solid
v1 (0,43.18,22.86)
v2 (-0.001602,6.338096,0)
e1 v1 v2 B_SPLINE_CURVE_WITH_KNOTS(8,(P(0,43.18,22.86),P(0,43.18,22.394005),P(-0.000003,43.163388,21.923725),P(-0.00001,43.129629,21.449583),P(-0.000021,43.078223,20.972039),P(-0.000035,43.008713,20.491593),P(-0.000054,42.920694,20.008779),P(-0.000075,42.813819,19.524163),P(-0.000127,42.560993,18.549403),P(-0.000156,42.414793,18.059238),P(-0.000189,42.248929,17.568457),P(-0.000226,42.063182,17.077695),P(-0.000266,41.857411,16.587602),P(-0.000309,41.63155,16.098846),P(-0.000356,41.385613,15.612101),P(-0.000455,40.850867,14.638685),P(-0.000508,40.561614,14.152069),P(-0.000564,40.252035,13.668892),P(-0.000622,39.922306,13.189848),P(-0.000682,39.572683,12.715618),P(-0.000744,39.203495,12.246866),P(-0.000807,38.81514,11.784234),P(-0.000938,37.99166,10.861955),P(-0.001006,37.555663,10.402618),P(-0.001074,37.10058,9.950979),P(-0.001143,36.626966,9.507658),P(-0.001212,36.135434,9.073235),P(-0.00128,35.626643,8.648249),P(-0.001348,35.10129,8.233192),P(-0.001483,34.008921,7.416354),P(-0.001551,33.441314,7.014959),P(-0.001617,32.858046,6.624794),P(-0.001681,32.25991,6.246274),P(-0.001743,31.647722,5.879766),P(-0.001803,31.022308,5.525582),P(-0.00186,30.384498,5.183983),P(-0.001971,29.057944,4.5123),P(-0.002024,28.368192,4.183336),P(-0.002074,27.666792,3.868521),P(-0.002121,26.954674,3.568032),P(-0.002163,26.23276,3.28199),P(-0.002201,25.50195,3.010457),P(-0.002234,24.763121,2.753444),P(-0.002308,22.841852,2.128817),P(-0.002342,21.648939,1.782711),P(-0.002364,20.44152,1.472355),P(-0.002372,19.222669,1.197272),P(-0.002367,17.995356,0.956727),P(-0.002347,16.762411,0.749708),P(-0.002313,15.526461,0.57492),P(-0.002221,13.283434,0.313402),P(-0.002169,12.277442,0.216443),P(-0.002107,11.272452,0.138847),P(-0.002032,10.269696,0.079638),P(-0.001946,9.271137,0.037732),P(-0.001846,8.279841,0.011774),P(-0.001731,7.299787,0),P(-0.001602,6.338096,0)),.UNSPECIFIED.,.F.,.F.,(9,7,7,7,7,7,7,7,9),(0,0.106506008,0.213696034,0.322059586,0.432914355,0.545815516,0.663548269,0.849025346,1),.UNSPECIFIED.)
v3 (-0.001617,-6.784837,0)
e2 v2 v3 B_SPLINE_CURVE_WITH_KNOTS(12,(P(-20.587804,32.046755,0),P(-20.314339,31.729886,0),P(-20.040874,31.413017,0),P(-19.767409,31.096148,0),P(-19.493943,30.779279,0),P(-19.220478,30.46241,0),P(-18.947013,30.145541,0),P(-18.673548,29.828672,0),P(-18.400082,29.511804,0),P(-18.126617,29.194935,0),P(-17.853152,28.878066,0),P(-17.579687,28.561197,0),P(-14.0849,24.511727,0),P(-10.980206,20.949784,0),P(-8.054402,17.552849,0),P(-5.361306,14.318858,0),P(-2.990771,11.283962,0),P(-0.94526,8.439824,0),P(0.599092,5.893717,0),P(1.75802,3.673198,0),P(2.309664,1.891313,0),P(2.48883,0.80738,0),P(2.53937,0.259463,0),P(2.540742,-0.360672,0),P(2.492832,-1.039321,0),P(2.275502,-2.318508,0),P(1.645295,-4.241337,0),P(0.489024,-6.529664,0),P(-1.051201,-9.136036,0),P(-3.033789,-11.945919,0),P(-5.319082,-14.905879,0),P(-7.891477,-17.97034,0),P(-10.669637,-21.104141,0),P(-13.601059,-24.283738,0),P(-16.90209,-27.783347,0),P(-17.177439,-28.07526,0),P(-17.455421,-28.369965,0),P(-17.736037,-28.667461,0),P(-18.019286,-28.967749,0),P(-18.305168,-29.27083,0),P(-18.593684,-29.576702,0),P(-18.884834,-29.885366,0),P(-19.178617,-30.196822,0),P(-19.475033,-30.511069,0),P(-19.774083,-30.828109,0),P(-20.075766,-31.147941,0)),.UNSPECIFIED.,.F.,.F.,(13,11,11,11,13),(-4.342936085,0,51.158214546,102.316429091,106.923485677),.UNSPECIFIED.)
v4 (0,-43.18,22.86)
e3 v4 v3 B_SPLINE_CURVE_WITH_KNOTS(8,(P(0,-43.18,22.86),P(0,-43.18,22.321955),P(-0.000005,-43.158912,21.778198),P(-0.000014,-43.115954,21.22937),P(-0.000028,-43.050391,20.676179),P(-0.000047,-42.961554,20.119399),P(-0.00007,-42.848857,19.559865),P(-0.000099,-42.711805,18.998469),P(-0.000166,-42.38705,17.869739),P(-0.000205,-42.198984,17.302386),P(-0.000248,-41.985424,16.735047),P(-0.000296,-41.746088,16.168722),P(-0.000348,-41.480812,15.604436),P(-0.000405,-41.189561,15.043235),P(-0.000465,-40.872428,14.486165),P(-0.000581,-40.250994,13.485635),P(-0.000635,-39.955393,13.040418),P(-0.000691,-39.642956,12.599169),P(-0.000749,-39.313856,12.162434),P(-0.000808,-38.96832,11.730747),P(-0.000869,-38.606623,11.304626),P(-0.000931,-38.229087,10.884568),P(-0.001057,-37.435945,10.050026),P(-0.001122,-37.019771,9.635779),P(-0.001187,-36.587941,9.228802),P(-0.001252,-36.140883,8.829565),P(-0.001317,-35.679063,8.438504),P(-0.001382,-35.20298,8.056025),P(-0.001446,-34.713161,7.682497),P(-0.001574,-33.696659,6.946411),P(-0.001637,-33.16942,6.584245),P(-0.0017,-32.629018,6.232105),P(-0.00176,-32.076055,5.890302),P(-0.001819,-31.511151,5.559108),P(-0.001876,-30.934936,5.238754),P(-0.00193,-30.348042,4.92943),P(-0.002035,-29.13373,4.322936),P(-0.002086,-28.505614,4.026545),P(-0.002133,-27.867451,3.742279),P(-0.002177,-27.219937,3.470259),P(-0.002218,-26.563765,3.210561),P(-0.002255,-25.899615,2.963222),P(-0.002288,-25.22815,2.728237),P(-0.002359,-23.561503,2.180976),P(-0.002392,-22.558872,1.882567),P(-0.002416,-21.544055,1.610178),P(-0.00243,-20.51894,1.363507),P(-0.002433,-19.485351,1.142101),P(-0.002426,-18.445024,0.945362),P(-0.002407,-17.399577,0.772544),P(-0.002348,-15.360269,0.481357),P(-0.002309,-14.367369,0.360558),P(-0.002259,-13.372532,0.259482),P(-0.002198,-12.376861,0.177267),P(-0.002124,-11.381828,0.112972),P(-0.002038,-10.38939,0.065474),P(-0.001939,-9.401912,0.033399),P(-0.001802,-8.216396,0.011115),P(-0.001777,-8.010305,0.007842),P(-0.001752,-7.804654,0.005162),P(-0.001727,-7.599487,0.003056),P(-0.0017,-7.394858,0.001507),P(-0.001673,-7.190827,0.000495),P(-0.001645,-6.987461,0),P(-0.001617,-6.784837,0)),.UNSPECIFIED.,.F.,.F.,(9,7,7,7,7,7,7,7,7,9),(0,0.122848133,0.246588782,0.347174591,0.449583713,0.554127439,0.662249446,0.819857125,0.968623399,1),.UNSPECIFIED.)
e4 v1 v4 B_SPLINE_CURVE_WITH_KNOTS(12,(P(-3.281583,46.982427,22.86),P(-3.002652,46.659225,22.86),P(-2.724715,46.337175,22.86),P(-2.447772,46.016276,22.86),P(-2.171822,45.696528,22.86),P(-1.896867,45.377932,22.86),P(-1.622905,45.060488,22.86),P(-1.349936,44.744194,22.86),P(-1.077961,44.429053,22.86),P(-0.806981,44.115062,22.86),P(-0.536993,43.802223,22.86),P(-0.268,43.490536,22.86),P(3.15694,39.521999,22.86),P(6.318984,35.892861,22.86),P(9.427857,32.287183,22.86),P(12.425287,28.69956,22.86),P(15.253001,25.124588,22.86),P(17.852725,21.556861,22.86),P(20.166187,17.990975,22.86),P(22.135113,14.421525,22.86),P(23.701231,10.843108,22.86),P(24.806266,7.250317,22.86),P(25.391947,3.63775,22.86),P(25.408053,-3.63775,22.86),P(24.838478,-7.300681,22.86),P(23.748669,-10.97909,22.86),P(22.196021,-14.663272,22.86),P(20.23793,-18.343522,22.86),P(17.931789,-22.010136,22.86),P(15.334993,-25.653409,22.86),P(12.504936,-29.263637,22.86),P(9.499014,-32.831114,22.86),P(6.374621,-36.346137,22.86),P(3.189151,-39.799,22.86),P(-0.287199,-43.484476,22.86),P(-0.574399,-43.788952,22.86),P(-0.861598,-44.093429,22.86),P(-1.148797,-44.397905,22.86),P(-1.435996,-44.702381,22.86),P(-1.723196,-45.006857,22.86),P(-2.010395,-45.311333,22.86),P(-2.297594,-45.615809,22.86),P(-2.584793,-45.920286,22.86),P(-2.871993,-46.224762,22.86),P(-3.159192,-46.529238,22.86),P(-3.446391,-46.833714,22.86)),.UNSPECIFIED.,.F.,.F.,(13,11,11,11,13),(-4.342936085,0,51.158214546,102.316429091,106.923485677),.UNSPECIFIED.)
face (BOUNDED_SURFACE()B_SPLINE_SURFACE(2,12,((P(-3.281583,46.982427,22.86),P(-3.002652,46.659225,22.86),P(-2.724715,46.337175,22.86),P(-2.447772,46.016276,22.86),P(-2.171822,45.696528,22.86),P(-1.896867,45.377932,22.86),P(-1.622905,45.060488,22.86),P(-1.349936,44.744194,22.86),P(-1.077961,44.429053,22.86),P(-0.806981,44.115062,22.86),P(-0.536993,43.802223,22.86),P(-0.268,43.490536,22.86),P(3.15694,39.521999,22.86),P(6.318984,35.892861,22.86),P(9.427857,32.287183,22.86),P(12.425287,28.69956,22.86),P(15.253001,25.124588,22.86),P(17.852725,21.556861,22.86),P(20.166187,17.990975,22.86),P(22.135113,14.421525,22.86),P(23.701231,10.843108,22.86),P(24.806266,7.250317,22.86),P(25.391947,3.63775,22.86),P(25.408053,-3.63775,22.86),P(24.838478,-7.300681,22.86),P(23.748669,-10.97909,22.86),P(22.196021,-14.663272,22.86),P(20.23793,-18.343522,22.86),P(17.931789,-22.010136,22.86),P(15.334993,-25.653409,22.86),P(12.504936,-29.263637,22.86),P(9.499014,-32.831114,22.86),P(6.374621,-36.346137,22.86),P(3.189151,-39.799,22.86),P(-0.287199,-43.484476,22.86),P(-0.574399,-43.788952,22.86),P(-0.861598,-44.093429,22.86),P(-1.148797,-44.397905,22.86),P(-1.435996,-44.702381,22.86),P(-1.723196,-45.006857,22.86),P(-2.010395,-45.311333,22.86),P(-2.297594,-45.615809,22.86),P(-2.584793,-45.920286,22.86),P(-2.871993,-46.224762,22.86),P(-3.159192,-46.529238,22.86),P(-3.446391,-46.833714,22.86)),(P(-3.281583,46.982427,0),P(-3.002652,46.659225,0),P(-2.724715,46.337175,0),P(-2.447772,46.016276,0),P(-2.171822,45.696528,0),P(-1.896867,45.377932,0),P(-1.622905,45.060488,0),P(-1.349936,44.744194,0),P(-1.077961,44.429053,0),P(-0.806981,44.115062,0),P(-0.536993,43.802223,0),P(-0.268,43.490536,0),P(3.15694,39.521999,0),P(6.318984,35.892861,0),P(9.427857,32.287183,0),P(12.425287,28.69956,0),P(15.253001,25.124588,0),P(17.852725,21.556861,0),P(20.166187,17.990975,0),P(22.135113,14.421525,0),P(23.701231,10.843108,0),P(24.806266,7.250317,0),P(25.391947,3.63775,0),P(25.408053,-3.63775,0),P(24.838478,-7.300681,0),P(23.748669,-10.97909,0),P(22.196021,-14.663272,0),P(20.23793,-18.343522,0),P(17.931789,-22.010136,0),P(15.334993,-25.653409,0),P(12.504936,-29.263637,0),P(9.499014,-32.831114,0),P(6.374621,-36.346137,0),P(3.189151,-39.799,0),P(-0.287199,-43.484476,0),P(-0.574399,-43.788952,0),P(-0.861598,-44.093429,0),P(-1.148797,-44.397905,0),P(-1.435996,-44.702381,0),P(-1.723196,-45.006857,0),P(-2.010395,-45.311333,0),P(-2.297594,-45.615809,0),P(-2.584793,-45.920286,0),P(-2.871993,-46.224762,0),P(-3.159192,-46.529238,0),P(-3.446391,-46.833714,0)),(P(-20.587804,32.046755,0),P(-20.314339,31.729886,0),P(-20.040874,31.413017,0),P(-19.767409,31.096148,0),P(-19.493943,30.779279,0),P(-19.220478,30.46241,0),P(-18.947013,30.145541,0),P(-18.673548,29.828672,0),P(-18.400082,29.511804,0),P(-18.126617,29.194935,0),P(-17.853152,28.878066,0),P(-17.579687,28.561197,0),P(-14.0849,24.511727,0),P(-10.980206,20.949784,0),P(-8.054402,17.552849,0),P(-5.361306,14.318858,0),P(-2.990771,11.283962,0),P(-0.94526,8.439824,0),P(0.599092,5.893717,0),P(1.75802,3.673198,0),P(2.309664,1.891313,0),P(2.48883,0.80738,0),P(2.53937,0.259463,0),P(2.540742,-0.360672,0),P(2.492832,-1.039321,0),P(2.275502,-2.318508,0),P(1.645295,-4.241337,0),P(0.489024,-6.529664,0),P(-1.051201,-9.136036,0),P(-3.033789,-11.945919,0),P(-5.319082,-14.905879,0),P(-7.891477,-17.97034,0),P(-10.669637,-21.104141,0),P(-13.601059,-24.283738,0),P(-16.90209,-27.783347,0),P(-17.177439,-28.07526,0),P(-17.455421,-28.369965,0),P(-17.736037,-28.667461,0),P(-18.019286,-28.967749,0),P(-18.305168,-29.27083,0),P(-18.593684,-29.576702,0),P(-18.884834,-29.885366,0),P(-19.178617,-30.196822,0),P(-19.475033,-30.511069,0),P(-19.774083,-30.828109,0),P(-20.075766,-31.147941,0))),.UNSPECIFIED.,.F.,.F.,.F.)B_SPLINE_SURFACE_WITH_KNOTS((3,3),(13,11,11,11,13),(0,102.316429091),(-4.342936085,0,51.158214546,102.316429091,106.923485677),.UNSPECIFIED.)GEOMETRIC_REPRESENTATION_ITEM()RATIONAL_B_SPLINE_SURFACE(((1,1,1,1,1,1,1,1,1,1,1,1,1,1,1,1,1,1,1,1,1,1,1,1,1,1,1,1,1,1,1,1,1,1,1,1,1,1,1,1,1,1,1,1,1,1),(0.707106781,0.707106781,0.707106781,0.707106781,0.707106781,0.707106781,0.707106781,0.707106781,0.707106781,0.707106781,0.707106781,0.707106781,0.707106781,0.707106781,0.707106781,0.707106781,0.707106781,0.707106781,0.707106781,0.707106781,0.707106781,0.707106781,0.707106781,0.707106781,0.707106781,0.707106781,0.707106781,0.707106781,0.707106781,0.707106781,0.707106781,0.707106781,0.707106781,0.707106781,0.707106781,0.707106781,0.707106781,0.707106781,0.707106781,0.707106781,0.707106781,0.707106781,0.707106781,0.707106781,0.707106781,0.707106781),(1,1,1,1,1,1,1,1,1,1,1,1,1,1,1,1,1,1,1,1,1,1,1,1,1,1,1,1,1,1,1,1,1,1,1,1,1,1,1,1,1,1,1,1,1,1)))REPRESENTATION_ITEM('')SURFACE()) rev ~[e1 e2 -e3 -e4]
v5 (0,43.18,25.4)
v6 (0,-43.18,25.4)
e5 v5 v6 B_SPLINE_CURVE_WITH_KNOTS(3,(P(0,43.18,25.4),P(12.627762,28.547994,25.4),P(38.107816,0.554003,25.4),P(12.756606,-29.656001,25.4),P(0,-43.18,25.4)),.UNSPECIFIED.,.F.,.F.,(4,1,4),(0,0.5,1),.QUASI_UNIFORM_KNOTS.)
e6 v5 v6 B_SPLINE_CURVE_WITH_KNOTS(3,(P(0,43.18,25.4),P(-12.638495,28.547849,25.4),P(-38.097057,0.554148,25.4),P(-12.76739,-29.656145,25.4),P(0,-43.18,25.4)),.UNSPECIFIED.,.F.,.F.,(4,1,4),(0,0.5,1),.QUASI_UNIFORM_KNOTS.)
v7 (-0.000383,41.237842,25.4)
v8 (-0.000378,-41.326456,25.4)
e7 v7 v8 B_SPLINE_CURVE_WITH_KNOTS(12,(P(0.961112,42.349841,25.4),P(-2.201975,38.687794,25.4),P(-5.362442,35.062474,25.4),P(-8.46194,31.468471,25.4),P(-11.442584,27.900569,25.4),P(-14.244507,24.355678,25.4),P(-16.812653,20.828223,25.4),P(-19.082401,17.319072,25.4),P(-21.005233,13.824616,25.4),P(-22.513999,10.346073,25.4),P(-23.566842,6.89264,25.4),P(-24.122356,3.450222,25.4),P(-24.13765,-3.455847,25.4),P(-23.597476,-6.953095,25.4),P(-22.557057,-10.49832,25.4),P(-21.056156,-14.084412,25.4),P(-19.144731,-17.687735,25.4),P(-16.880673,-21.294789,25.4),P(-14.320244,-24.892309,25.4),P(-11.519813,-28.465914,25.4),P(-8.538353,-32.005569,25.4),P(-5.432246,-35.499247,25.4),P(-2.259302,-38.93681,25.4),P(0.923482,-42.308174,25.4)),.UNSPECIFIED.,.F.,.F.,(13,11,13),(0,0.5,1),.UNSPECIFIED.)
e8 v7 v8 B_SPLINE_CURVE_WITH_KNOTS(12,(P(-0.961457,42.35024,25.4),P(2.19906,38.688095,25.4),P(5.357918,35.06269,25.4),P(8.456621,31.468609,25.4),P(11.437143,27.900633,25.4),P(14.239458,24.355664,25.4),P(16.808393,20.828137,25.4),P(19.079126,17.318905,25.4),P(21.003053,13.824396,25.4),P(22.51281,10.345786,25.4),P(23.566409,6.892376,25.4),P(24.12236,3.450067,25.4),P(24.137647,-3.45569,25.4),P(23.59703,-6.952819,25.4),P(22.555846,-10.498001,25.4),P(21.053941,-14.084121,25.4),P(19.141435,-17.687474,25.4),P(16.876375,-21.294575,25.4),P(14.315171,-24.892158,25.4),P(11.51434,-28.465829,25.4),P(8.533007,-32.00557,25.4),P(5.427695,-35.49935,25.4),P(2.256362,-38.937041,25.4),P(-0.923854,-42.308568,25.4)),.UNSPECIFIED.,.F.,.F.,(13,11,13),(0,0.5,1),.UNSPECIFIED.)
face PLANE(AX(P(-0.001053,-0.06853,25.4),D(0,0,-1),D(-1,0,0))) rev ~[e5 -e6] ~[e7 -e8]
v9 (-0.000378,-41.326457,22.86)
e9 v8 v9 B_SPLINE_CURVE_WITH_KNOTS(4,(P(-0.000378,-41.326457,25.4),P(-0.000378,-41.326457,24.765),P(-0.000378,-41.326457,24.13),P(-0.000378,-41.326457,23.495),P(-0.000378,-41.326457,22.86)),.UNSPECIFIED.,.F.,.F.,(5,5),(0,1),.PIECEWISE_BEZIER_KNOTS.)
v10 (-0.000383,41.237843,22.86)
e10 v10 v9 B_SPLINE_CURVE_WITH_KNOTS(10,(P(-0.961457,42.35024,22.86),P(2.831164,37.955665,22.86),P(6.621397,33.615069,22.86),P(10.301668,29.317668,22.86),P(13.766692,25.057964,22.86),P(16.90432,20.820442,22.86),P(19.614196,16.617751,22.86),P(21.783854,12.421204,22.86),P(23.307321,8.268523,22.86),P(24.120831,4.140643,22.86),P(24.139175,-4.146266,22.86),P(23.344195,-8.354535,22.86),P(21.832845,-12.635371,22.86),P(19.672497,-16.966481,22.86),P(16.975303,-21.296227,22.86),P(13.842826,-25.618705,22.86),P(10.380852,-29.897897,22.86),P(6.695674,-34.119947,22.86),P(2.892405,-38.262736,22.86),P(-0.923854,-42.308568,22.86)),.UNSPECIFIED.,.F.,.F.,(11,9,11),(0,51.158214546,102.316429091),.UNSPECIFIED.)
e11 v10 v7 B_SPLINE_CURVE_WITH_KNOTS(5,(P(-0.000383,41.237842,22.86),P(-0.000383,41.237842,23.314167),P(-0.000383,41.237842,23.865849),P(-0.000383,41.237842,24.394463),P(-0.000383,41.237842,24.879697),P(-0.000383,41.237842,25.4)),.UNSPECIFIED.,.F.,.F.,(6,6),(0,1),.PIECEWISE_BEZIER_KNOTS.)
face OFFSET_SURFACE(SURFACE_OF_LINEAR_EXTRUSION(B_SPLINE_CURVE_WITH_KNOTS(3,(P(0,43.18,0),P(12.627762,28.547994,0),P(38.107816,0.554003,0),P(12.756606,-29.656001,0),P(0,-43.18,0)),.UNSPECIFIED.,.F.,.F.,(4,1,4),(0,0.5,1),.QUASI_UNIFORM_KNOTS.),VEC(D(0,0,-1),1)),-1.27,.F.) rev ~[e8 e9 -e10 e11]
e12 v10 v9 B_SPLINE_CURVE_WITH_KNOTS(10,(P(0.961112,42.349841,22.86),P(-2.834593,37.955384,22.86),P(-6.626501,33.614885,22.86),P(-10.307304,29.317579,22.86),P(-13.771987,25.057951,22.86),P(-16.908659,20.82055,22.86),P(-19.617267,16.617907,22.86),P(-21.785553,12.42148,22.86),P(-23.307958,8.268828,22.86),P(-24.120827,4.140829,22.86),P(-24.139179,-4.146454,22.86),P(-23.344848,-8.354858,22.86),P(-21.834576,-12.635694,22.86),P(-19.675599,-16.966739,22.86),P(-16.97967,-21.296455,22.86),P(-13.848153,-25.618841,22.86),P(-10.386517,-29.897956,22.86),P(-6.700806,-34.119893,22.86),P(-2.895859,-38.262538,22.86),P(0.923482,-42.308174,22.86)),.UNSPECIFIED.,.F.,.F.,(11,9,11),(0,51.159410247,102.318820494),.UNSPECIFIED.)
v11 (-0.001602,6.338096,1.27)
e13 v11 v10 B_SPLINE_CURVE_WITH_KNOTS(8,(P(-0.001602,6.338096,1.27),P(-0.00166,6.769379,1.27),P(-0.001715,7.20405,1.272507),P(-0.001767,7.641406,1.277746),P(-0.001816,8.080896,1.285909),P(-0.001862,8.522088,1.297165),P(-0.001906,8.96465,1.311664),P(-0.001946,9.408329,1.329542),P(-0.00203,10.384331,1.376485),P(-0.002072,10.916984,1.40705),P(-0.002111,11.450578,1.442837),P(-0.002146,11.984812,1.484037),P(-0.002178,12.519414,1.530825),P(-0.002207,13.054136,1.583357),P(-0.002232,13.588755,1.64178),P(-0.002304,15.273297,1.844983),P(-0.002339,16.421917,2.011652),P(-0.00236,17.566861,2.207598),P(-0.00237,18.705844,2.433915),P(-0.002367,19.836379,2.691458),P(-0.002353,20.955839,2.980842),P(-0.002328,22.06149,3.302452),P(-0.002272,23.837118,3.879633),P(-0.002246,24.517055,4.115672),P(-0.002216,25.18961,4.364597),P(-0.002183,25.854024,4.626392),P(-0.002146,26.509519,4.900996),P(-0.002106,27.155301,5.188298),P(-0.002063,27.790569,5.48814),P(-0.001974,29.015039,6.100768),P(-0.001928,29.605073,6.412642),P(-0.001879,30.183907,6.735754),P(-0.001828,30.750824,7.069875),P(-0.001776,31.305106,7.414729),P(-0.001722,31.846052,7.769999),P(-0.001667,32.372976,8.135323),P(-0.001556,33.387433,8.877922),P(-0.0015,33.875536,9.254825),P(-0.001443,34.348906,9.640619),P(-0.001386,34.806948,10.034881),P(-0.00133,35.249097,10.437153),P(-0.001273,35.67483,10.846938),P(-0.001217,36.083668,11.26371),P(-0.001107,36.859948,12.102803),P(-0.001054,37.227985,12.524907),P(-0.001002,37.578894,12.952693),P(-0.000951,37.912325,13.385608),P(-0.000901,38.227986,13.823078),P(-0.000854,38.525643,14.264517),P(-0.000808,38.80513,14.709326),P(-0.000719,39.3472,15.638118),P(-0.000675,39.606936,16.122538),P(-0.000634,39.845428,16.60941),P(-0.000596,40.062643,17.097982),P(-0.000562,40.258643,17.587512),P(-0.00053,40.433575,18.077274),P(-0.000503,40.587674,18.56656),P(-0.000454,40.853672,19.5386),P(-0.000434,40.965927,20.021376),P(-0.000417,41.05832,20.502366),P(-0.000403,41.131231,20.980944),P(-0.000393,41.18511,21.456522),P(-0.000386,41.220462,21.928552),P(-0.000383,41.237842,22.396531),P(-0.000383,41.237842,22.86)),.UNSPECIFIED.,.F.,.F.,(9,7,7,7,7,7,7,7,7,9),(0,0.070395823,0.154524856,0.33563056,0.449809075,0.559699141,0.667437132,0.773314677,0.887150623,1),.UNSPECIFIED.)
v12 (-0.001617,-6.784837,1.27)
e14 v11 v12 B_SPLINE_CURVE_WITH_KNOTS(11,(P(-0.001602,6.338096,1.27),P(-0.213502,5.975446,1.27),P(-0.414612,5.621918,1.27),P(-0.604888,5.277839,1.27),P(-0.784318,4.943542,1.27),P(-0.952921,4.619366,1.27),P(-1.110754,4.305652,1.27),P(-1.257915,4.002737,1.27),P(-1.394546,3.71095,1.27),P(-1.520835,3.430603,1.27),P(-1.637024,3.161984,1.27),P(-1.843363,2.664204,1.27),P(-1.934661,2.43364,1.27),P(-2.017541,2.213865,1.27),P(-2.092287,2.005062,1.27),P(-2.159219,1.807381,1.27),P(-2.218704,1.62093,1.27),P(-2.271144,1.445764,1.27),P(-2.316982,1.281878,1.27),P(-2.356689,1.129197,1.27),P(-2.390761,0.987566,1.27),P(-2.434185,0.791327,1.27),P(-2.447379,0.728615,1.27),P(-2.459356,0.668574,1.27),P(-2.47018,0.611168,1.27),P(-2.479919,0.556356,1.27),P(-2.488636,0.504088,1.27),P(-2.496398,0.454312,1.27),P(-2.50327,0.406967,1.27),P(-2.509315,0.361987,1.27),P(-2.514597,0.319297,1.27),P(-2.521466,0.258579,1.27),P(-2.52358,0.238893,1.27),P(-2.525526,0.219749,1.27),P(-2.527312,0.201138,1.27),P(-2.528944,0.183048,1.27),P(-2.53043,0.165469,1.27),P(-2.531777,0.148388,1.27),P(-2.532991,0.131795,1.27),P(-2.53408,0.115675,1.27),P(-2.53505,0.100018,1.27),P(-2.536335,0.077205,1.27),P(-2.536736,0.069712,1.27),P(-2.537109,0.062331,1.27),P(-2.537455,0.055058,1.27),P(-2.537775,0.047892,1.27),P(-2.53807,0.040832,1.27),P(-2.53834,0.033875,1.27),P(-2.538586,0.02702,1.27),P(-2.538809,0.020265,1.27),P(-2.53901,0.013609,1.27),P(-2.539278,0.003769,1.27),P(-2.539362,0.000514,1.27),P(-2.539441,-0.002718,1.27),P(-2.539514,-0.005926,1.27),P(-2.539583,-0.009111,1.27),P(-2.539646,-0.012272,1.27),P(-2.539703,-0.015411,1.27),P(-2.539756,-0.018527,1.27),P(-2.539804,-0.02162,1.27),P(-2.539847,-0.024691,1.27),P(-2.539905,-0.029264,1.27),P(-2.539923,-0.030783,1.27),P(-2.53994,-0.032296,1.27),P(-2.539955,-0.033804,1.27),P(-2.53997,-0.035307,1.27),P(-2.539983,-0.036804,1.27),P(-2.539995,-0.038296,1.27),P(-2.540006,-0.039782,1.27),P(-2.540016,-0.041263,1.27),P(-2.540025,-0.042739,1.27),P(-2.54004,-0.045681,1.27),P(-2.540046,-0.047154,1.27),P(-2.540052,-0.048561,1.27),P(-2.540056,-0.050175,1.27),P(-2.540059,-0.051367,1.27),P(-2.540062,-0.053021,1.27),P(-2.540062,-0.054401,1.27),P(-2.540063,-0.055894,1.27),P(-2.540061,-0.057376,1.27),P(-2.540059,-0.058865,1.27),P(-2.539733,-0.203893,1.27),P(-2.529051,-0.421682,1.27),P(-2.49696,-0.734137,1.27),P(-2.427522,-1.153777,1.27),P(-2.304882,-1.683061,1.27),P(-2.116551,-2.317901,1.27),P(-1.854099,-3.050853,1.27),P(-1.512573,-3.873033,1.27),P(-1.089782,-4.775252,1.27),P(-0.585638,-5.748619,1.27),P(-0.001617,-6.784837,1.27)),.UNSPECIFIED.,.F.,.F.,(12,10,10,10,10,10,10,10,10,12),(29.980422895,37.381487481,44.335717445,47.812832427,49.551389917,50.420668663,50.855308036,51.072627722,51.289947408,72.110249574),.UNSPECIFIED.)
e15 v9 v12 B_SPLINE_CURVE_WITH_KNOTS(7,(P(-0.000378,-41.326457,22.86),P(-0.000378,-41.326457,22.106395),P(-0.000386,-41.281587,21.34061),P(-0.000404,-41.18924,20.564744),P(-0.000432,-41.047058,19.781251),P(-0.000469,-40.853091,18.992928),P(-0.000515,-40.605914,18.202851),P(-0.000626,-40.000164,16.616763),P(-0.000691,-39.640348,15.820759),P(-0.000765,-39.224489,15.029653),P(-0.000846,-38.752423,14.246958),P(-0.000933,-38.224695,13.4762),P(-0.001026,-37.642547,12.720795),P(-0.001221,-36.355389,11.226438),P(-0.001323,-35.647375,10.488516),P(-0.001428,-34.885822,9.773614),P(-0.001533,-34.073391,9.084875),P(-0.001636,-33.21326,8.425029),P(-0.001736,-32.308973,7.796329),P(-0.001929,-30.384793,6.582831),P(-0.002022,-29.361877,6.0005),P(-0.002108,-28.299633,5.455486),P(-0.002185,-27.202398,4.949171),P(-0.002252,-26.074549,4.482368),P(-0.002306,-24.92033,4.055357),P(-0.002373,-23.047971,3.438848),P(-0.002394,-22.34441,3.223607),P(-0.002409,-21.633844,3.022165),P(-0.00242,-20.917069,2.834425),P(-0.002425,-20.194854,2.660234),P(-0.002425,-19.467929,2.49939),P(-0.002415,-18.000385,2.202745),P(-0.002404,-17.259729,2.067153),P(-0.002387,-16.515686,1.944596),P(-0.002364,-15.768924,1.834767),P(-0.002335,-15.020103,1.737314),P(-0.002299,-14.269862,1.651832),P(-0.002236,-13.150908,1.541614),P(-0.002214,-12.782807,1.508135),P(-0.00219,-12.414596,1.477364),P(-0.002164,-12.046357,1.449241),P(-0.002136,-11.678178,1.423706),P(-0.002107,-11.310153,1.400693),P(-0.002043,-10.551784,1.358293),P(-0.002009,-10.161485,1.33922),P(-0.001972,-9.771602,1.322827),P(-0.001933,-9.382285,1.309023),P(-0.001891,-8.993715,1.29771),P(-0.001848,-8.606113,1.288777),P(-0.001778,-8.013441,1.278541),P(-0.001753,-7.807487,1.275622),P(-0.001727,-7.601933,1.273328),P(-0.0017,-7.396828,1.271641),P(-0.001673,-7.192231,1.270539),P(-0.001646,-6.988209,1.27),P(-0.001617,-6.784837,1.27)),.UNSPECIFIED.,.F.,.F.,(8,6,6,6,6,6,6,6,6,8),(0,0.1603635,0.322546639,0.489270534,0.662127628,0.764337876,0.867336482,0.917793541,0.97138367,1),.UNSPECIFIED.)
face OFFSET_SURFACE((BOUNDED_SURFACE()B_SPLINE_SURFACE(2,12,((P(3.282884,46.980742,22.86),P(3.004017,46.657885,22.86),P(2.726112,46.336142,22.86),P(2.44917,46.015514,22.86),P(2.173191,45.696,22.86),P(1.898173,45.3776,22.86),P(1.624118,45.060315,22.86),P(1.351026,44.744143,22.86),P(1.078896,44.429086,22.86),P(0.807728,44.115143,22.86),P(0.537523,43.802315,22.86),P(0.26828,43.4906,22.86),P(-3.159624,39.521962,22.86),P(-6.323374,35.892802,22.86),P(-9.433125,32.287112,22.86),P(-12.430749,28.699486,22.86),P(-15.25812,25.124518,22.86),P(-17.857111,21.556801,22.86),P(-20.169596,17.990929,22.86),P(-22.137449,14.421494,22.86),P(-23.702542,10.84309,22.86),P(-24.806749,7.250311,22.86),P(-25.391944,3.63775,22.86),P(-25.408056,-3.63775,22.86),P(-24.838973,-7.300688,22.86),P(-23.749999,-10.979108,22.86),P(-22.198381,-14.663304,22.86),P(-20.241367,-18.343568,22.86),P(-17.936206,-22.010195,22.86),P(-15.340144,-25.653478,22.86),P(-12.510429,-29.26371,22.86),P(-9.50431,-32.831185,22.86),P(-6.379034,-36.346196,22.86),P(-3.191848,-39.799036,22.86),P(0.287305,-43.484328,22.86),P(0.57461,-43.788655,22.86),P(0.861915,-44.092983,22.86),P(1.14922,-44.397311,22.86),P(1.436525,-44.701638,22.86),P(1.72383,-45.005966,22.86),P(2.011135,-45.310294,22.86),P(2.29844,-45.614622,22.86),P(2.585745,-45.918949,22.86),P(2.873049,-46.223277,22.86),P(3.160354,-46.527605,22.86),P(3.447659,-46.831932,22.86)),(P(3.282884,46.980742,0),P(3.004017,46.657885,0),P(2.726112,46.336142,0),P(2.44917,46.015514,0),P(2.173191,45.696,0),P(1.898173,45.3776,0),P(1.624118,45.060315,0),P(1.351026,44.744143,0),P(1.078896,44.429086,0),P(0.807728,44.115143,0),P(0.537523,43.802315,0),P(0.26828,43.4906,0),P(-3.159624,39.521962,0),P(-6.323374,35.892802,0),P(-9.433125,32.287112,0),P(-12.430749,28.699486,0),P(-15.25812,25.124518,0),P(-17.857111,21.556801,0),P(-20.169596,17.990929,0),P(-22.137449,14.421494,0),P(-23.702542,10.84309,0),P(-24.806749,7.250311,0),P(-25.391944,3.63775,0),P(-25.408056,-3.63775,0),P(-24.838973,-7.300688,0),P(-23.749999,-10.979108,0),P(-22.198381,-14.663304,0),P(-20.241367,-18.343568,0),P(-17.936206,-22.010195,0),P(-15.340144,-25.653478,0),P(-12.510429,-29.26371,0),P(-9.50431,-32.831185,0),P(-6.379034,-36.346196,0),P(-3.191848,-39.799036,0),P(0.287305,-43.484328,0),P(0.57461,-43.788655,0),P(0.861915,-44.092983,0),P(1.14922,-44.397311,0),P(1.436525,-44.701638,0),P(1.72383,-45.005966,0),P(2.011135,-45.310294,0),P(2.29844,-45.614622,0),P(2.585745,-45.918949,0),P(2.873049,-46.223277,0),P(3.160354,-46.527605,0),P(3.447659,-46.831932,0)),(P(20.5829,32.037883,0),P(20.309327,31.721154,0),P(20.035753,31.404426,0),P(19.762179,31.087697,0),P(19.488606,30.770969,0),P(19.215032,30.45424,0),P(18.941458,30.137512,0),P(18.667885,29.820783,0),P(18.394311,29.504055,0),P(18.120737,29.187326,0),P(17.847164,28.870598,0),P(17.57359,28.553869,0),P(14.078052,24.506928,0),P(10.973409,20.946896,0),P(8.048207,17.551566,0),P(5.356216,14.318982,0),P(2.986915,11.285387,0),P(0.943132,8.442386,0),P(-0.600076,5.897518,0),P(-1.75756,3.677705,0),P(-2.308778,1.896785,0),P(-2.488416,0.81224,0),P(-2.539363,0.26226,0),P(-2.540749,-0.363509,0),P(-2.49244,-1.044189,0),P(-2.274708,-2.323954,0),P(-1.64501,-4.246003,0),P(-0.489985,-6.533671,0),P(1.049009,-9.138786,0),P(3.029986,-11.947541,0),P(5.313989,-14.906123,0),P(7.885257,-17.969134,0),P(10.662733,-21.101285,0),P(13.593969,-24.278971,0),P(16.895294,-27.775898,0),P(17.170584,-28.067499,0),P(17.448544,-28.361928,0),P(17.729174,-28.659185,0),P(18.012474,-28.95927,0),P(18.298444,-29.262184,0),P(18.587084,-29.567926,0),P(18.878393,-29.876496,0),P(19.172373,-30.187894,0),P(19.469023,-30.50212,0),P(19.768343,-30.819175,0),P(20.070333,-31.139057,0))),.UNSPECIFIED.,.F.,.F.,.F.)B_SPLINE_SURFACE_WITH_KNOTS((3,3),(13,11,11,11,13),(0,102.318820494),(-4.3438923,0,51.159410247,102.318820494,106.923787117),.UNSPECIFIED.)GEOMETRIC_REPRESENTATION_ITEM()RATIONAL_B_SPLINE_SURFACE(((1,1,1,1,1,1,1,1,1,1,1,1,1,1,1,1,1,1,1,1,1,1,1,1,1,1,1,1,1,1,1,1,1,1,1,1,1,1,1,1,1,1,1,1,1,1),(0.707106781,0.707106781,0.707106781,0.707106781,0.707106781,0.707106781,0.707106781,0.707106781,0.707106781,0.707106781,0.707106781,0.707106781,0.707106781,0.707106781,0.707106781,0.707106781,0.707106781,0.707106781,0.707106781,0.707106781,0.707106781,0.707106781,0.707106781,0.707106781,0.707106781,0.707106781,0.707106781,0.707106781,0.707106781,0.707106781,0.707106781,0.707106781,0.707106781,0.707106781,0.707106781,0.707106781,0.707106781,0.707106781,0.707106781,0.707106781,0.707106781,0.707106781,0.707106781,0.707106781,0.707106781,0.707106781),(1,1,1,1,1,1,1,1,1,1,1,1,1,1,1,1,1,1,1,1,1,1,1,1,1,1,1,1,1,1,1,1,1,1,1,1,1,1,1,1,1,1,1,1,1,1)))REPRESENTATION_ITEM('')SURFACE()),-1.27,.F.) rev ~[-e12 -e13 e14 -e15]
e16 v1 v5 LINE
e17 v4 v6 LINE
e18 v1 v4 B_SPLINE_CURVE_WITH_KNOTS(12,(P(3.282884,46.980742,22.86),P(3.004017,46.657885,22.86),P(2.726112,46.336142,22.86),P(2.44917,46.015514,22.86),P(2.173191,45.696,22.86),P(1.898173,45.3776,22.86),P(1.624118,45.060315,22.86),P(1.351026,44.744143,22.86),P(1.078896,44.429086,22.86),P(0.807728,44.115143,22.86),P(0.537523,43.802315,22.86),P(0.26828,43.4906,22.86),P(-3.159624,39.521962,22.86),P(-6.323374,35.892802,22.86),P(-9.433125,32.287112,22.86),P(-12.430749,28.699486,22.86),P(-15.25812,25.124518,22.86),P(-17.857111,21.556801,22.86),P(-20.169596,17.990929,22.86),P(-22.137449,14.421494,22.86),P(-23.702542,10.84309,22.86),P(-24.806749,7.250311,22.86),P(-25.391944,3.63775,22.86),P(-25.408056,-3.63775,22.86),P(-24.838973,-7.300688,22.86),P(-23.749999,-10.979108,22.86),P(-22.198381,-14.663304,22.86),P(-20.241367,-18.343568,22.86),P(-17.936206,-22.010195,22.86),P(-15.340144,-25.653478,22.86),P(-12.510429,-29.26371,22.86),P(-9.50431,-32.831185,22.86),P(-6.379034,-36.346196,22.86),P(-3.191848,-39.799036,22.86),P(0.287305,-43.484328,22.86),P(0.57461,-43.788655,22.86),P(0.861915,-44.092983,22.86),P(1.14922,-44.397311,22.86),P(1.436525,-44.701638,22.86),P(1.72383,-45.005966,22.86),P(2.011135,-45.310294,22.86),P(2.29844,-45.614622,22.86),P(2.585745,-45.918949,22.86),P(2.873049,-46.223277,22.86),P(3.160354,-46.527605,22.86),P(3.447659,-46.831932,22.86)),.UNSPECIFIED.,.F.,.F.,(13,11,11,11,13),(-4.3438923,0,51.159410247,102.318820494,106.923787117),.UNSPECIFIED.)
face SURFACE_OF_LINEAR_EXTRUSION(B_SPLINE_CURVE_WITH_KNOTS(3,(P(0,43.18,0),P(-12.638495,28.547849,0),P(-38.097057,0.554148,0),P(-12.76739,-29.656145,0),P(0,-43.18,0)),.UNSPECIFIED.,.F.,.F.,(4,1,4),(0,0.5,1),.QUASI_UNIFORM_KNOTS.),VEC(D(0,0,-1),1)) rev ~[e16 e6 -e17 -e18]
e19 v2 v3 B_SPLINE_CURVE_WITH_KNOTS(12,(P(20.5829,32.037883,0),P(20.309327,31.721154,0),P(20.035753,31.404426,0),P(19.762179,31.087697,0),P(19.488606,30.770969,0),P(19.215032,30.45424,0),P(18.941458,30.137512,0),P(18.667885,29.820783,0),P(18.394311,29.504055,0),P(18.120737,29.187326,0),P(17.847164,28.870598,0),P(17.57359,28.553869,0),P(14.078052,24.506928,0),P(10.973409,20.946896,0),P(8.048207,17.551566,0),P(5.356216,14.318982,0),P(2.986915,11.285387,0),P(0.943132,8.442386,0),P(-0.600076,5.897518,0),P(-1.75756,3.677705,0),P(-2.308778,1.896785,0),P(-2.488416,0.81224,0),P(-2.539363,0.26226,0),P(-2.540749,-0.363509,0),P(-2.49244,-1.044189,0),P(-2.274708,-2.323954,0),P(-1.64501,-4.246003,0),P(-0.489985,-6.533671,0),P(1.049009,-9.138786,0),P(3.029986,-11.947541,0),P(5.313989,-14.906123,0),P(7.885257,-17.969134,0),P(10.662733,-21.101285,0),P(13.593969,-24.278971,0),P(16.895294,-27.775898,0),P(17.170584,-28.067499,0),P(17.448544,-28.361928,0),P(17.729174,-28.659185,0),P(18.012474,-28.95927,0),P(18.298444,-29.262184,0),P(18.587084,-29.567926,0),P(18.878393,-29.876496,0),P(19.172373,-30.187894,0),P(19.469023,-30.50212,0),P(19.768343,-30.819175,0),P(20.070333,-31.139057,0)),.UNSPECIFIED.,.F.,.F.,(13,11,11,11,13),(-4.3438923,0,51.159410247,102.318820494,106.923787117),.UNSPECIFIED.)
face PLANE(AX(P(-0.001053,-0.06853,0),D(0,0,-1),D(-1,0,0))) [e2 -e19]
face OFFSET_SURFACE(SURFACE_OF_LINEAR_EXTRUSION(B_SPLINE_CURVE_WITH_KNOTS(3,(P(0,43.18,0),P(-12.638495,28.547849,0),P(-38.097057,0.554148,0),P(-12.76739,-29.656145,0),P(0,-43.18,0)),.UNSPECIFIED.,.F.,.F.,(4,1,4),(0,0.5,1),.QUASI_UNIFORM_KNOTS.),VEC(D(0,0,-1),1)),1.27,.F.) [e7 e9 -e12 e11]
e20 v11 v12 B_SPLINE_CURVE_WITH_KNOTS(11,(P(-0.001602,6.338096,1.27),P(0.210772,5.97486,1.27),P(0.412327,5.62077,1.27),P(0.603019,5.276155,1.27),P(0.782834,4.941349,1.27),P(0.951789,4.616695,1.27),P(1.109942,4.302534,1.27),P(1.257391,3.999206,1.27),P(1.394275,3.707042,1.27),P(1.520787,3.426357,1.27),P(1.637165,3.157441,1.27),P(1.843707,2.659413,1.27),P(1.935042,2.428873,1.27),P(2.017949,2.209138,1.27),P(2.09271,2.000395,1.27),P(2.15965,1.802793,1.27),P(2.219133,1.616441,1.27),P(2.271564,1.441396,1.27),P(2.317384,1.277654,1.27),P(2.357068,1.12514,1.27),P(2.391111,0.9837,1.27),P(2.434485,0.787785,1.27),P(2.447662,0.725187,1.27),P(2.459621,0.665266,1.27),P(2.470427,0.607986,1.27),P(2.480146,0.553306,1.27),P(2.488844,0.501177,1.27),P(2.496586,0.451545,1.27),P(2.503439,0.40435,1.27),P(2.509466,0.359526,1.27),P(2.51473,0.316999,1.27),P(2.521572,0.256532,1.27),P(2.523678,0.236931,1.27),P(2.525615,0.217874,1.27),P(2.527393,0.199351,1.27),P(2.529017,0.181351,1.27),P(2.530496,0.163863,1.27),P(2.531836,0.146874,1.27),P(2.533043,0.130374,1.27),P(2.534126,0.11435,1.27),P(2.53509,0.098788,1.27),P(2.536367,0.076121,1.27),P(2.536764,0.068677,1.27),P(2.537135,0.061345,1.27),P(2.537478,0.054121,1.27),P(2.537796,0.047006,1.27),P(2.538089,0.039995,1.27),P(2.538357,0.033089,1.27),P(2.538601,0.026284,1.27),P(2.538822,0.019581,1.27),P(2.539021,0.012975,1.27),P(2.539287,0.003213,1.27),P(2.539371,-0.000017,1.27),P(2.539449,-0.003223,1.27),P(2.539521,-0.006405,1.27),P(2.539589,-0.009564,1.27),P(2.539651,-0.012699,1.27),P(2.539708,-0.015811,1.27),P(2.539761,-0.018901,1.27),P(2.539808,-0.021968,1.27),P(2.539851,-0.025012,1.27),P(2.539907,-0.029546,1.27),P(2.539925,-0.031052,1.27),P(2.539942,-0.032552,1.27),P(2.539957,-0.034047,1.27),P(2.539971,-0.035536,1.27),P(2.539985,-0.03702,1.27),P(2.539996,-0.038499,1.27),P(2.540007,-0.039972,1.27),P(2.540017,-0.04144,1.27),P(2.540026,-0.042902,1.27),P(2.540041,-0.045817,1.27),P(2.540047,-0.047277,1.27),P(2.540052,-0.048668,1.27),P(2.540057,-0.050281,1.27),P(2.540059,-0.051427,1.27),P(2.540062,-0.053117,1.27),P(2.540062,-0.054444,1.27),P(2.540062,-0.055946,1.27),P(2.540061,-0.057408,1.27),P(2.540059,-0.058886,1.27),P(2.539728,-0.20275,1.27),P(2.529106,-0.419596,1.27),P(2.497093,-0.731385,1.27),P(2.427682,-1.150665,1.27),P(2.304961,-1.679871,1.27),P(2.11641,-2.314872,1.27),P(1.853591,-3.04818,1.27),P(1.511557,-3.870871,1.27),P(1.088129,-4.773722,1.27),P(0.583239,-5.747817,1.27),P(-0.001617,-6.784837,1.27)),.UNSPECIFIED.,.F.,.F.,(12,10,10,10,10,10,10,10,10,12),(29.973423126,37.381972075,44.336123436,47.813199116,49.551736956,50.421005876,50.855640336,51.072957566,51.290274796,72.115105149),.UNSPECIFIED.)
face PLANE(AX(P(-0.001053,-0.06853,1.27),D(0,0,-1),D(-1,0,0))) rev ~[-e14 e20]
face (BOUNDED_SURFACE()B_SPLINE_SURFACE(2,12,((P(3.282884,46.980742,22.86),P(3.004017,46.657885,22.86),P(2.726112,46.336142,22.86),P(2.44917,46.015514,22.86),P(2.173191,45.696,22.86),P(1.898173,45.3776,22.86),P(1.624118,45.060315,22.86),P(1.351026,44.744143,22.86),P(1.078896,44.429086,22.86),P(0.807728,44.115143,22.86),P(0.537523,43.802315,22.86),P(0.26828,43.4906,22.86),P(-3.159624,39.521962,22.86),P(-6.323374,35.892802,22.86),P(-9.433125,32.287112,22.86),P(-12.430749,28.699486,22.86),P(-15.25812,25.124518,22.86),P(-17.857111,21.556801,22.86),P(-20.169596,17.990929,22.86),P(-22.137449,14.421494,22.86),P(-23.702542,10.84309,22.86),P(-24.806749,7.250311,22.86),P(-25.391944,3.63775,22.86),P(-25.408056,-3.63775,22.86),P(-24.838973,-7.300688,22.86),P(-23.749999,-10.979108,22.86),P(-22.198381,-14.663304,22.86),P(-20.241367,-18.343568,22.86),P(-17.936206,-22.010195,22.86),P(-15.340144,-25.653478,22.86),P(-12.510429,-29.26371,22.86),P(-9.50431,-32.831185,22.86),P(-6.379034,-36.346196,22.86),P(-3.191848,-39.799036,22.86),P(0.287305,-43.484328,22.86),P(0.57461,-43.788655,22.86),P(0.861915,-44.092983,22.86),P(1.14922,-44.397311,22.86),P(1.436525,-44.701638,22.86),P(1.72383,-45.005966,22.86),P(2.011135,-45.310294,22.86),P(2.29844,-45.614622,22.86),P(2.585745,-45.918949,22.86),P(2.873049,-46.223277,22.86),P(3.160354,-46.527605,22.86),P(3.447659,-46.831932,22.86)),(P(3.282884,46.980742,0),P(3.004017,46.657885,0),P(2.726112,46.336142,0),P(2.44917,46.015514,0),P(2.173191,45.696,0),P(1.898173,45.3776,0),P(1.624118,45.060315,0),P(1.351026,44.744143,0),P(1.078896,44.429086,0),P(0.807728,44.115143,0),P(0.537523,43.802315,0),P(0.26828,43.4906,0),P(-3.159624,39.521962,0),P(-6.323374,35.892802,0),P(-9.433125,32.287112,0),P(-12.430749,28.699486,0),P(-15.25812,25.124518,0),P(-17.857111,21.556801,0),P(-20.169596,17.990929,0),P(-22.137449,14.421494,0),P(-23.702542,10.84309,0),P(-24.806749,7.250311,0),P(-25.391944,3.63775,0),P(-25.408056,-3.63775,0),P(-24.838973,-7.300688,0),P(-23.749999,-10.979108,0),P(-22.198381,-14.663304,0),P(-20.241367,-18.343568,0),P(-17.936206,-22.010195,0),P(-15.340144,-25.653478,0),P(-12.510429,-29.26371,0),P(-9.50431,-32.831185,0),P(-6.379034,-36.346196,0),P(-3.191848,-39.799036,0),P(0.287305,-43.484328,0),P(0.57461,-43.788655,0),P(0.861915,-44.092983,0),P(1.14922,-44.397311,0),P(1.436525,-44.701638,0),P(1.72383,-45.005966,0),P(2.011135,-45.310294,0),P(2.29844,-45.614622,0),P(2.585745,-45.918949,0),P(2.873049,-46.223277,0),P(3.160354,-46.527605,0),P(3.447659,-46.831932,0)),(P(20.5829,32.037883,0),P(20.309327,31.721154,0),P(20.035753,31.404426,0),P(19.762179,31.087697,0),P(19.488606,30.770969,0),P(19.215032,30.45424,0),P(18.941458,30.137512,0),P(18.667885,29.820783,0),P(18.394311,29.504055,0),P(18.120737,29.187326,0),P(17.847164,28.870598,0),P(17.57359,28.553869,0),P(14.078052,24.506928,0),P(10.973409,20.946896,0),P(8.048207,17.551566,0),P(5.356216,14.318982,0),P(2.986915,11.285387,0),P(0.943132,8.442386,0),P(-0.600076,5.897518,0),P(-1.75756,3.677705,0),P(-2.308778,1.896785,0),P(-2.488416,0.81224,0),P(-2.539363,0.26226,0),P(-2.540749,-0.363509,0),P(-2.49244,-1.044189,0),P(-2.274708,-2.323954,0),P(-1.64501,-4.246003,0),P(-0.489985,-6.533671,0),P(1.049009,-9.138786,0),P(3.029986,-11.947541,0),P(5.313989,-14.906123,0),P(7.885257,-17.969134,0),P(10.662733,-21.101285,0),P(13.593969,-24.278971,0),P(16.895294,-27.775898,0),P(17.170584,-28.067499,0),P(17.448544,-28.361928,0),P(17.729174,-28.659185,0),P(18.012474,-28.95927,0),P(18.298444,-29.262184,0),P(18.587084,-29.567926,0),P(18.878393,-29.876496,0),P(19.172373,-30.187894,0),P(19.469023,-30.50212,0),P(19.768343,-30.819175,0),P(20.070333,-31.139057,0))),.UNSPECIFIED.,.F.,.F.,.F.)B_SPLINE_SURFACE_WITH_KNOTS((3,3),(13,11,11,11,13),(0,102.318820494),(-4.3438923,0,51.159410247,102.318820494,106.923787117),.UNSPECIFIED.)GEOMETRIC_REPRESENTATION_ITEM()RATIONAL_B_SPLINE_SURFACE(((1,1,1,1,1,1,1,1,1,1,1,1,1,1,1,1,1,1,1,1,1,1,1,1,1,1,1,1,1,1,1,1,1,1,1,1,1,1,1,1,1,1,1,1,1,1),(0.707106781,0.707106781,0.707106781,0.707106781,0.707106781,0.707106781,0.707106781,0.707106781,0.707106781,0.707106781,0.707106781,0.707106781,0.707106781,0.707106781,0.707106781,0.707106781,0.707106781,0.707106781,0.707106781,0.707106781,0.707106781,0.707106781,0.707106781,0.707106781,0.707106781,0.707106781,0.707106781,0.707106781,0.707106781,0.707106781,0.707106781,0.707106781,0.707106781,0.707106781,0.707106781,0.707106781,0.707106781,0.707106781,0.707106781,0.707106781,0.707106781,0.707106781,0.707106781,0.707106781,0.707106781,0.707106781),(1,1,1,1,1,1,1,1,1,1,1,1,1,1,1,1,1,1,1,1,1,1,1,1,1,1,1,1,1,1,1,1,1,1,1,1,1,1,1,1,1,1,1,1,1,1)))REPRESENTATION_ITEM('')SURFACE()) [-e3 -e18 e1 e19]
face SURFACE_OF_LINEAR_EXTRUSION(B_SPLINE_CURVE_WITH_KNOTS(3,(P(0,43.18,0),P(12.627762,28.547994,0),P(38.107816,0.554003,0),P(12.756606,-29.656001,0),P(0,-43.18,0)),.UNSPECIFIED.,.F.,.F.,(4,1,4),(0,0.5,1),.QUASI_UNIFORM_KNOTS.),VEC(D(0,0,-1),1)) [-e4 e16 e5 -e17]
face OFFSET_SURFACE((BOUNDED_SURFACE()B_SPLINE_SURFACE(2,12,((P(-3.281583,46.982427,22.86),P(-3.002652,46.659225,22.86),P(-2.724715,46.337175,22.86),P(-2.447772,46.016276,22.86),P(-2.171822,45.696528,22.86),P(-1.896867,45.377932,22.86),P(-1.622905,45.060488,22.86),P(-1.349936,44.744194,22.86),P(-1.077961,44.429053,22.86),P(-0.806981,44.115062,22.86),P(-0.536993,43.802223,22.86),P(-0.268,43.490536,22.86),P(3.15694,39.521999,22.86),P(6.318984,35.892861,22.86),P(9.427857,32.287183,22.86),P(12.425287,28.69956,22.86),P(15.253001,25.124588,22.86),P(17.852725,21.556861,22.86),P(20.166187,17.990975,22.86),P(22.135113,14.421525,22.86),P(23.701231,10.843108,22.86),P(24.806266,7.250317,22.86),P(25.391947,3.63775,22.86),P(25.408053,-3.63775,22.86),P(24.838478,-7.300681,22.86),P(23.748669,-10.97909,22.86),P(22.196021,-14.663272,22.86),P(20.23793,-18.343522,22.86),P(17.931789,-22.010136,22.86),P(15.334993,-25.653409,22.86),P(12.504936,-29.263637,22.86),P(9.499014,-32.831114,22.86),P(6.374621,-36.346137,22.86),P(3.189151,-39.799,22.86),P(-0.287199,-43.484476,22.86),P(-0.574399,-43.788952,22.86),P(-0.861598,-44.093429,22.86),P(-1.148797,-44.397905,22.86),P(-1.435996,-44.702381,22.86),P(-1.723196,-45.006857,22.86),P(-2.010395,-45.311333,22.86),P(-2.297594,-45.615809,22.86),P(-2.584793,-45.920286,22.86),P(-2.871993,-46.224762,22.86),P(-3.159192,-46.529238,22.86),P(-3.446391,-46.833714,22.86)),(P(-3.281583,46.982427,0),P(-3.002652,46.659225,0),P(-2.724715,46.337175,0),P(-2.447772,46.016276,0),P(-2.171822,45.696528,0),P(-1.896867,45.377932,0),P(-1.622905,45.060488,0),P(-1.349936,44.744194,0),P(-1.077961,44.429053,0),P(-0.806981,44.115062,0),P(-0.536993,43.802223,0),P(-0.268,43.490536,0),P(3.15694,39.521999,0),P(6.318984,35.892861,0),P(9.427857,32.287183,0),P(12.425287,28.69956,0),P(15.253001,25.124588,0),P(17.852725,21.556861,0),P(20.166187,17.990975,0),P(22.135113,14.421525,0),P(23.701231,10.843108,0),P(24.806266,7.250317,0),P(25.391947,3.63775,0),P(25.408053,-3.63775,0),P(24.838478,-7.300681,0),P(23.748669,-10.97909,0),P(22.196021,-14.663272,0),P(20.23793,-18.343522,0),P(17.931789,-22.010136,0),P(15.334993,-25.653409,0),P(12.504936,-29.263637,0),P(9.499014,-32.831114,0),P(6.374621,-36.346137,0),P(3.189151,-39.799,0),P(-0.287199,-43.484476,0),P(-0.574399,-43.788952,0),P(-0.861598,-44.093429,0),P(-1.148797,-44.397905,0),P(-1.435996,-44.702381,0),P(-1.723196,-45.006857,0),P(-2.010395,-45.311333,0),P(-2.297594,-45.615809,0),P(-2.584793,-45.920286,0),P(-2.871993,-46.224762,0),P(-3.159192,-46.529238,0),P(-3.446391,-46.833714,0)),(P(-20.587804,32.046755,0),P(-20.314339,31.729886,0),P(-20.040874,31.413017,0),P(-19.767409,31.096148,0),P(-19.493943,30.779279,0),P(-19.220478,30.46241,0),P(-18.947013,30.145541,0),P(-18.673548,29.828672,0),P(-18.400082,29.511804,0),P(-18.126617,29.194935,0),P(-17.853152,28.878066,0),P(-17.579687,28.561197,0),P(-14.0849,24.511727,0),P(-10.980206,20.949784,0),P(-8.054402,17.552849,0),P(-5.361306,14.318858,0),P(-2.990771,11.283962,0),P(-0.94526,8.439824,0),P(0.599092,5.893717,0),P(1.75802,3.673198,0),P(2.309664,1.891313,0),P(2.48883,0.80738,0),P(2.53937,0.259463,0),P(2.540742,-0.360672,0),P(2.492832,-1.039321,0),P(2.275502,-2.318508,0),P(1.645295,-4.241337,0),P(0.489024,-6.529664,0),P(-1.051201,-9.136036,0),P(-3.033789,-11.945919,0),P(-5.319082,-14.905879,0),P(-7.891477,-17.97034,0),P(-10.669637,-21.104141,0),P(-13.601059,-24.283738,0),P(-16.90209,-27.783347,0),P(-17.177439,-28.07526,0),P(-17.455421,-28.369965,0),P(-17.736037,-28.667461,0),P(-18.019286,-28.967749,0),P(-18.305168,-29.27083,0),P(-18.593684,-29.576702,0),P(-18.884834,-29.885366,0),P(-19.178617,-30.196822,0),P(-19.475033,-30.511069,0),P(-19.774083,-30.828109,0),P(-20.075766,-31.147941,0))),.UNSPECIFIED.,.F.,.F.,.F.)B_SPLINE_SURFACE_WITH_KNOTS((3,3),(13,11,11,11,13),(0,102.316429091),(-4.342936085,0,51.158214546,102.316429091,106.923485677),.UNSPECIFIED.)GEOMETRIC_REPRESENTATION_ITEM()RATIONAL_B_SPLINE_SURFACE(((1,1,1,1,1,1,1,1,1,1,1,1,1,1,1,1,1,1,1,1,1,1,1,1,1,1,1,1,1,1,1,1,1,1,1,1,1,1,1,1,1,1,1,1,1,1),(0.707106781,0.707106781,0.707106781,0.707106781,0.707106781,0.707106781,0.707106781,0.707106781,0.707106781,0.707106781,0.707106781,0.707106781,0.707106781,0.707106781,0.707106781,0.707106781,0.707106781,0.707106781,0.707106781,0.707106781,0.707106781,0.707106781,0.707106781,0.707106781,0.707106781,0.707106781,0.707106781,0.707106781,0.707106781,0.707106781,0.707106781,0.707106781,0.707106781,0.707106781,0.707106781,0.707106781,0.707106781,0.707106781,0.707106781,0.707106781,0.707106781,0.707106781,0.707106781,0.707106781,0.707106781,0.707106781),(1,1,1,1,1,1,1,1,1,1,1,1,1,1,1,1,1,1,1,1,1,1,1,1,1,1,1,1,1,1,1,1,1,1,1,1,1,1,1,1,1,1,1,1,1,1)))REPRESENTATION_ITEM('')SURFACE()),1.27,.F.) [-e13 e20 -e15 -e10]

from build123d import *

# Parameters (mm, degrees)
F1_DEPTH = 25.4
F2_R     = 22.86
F3_T     = 1.27


# Not quite as in the source:
# - a shell that OpenCascade refuses in one call is made with other operations: the cavity is built on its own and cut out


with BuildPart() as f1:
    # F0 (on Top) → F1 (new body)
    with BuildSketch(Plane.XY):
        with BuildLine():
            add(Edge.make_bspline(
                [(0, 43.18), (12.6277618203, 28.5479942033), (38.1078160952, 0.5540033901), (12.7566059893, -29.6560009835), (0, -43.18)],
                knots=[0, 0, 0, 0, 0.5, 1, 1, 1, 1], degree=3))
            add(Edge.make_bspline(
                [(0, 43.18), (-12.6384950786, 28.547848961), (-38.0970572555, 0.5541481006), (-12.7673904104, -29.6561451622), (0, -43.18)],
                knots=[0, 0, 0, 0, 0.5, 1, 1, 1, 1], degree=3))
        make_face()
    extrude(amount=F1_DEPTH)

    # F2
    f2_edges = [f1.edges().sort_by_distance(p)[0] for p in [
        (25.400061, -0.050271, 0),
        (-25.400061, -0.050358, 0),
    ]]
    fillet(f2_edges, radius=F2_R)

    # F3: shell of thickness 1.27, made by hand


with BuildPart() as f3_core1:
    # F3_t2: copy of F1
    add(f1.part)

    # the walls: a layer under each face that stays
    f3_faces = [f3_core1.faces().sort_by_distance(p)[0] for p in [
        (25.4, 0, 24.1299999999),
        (-25.4, 0, 24.1299999999),
        (18.704477423, -0.0148216465, 6.6955389821),
        (-18.704477436, -0.0148275323, 6.6955389821),
        (-1.3114e-06, -0.2233707907, 0),
    ]]
    thicken(f3_faces, amount=-F3_T, mode=Mode.SUBTRACT)


with BuildPart() as f1_1:
    add(f1.part)

    # what is left inside the walls is the cavity
    f3_cavity = [f3_core1.part.solids().sort_by_distance(p)[0] for p in [
        (-2e-06, -13.805023, 25.3873),
    ]]
    add(f3_cavity, mode=Mode.SUBTRACT)


solid = f1_1.part
